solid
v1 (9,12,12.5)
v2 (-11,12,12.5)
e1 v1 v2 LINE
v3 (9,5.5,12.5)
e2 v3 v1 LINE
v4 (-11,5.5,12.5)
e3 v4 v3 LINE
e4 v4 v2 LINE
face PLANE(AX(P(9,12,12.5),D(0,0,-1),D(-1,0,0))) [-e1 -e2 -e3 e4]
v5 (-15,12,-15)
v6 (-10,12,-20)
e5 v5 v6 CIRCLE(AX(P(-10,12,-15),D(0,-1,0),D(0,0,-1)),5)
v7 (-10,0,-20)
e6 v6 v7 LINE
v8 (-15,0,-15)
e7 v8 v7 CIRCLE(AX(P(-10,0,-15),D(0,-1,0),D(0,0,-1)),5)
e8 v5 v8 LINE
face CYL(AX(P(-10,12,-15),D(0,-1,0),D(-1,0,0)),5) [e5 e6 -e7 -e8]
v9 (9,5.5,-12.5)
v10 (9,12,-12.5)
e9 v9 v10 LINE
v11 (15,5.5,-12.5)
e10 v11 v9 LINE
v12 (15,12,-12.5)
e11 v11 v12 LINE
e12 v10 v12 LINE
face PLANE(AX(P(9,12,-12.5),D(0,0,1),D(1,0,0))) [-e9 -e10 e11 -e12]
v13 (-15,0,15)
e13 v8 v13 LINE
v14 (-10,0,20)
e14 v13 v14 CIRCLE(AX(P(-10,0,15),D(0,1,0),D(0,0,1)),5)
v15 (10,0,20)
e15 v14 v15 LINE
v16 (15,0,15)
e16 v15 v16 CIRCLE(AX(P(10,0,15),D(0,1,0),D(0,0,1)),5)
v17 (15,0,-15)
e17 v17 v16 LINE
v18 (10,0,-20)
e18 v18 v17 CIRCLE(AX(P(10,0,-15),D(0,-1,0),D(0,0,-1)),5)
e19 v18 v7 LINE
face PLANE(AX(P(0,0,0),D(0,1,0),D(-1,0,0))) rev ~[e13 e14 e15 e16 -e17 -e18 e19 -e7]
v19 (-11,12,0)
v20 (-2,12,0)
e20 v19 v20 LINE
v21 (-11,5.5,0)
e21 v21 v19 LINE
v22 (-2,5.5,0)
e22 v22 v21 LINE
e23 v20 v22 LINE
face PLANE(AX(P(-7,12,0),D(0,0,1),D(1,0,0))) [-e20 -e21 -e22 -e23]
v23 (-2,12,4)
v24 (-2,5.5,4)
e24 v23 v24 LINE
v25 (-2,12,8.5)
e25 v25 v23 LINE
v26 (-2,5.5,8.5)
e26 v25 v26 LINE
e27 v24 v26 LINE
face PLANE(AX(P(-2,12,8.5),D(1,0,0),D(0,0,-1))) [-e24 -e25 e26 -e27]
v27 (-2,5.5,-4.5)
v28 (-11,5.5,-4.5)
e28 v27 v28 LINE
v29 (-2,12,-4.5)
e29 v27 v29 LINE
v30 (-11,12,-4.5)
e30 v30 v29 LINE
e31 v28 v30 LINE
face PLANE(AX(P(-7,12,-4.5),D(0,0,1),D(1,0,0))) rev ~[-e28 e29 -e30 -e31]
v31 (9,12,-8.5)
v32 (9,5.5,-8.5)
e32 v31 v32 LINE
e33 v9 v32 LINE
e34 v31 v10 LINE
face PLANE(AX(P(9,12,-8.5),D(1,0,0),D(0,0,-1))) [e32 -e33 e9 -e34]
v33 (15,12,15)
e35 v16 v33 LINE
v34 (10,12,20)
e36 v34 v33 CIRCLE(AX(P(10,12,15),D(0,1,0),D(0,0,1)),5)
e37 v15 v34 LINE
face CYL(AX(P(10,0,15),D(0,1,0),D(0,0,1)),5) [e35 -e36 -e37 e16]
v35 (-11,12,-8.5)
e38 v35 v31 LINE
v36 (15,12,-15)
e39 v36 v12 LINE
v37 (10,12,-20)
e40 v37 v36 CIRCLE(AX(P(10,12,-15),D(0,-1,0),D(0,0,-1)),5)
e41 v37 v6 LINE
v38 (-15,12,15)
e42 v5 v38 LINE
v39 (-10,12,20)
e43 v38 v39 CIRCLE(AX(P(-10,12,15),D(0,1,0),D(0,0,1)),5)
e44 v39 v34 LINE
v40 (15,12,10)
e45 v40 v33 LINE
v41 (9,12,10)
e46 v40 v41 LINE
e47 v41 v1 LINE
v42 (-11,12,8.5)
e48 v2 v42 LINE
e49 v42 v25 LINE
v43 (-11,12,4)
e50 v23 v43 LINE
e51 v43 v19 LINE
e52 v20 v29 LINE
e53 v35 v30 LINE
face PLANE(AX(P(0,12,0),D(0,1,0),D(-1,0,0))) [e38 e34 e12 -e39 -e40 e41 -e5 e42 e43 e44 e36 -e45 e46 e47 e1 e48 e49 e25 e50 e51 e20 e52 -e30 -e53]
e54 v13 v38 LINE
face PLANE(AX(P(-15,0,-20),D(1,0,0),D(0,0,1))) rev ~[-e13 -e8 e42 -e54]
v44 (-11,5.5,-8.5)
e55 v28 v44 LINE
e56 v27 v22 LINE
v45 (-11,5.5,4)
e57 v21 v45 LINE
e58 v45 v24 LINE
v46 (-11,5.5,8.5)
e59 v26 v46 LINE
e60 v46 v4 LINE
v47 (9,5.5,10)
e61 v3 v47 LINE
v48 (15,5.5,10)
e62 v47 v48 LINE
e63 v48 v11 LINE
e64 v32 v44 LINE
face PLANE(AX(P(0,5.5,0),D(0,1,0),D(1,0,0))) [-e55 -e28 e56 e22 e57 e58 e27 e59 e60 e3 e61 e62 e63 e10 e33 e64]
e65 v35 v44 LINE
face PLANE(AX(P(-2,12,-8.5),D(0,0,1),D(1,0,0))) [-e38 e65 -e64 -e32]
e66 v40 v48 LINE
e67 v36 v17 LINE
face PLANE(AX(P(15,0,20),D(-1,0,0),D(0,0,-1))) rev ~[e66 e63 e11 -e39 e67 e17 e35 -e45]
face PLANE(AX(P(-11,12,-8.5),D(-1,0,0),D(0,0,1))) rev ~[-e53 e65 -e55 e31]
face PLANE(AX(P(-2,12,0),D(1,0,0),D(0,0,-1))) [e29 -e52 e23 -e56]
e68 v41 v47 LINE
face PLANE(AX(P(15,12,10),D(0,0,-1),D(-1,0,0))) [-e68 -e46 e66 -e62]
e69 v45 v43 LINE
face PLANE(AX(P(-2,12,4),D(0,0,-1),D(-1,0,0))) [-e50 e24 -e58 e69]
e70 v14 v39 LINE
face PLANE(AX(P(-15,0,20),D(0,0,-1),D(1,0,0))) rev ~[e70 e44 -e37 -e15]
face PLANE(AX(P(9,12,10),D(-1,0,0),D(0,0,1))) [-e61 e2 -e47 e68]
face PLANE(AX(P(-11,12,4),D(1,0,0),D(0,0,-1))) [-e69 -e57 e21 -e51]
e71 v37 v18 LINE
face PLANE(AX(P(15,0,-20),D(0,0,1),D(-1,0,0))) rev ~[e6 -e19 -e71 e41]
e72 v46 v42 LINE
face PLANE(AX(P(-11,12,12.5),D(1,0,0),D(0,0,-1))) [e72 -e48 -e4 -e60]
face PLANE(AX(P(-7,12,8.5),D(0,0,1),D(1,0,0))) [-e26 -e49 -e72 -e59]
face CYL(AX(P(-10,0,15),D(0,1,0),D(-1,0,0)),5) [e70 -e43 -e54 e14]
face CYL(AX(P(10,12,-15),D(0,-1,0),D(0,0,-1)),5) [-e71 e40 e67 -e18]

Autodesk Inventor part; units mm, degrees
ref_plane "YZ Plane" through (0, 0, 0) normal (1, 0, 0) x (0, 1, 0)
ref_plane "XZ Plane" through (0, 0, 0) normal (0, 1, 0) x (-1, 0, 0)
ref_plane "XY Plane" through (0, 0, 0) normal (0, 0, 1) x (1, 0, 0)
sketch "Sketch1" plane through (0, 0, 0) normal (0, 1, 0) x (-1, 0, 0)
  line L0 (15, 20) -> (-15, 20)
  line L1 (-15, 20) -> (-15, -20)
  line L2 (-15, -20) -> (15, -20)
  line L3 (15, -20) -> (15, 20)
  line L4 (15, 20) -> (-15, -20) construction
  line L5 (-15, 20) -> (15, -20) construction
  point P0 (0, 0)
  dimension "d0" = 30
  dimension "d1" = 40
extrude "Extrusion1" add sketch "Sketch1" along normal blind 12
sketch "Sketch2" plane through (0, 12, 0) normal (0, 1, 0) x (1, 0, 0)
  line L0 (15, -20) -> (15, 20) projected
  line L1 (15, -12.5) -> (-2, -12.5)
  line L2 (-2, 8.5) -> (9, 8.5)
  line L3 (15, 8.5) -> (15, -12.5)
  line L4 (15, -10) -> (9, -10)
  line L5 (9, -10) -> (9, -12.5)
  line L6 (9, -12.5) -> (15, -12.5)
  line L7 (15, -12.5) -> (15, -10)
  line L8 (-2, -12.5) -> (-7, -12.5)
  line L9 (-7, -12.5) -> (-7, -8.5)
  line L10 (-7, -8.5) -> (-2, -8.5)
  line L11 (-2, -8.5) -> (-2, -12.5)
  line L12 (-2, -4) -> (-7, -4)
  line L13 (-7, -4) -> (-7, 0)
  line L14 (-7, 0) -> (-2, 0)
  line L15 (-2, 8.5) -> (-7, 8.5)
  line L16 (-7, 8.5) -> (-7, 4.5)
  line L17 (-7, 4.5) -> (-2, 4.5)
  line L18 (-2, 4.5) -> (-2, 8.5)
  line L19 (15, 8.5) -> (9, 8.5)
  line L20 (9, 8.5) -> (9, 12.5)
  line L21 (9, 12.5) -> (15, 12.5)
  line L22 (15, 12.5) -> (15, 8.5)
  line L23 (-2, -8.5) -> (-2, -4)
  line L24 (-2, 0) -> (-2, 4.5)
  line L25 (-15, -20) -> (15, -20) projected
  line L26 (15, 20) -> (-15, 20) projected
  point P0 (0, 0)
  point P1 (15, -10)
  dimension "d4" = 21
  dimension "d5" = 17
  dimension "d7" = 2.5
  dimension "d8" = 5
  dimension "d9" = 4
  dimension "d10" = 4
  dimension "d11" = 4
  dimension "d12" = 4.5
  dimension "d13" = 4.5
  dimension "d14" = 4
  dimension "d15" = 7.5
  dimension "d22" = 25
  dimension "d23" = 7.5
extrude "Extrusion2" cut sketch "Sketch2" against normal blind 6.5 contours L4 L5 L1 L11 L23 L12 L13 L14 L24 L18 L2 L19 L0 | L19 L20 L21 L0 | L8 L9 L10 L11 | L18 L17 L16 L15
move faces "Move1" translate (-4, 0, 0) faces at (-7, 9.8333, 9.8333) (-7, 9.8333, 1.3333) (-7, 9.8333, -7.1667)
fillet "Fillet1" radius 5 4 edges at (-15, 6, -20) (-15, 6, 20) (15, 6, -20) (15, 6, 20)
equation "\"d10\" = d9"
equation "\"d11\" = d9"
equation "\"d13\" = d12"
equation "\"d15\" = d23"
properties part number "wooden_limitswitch"
